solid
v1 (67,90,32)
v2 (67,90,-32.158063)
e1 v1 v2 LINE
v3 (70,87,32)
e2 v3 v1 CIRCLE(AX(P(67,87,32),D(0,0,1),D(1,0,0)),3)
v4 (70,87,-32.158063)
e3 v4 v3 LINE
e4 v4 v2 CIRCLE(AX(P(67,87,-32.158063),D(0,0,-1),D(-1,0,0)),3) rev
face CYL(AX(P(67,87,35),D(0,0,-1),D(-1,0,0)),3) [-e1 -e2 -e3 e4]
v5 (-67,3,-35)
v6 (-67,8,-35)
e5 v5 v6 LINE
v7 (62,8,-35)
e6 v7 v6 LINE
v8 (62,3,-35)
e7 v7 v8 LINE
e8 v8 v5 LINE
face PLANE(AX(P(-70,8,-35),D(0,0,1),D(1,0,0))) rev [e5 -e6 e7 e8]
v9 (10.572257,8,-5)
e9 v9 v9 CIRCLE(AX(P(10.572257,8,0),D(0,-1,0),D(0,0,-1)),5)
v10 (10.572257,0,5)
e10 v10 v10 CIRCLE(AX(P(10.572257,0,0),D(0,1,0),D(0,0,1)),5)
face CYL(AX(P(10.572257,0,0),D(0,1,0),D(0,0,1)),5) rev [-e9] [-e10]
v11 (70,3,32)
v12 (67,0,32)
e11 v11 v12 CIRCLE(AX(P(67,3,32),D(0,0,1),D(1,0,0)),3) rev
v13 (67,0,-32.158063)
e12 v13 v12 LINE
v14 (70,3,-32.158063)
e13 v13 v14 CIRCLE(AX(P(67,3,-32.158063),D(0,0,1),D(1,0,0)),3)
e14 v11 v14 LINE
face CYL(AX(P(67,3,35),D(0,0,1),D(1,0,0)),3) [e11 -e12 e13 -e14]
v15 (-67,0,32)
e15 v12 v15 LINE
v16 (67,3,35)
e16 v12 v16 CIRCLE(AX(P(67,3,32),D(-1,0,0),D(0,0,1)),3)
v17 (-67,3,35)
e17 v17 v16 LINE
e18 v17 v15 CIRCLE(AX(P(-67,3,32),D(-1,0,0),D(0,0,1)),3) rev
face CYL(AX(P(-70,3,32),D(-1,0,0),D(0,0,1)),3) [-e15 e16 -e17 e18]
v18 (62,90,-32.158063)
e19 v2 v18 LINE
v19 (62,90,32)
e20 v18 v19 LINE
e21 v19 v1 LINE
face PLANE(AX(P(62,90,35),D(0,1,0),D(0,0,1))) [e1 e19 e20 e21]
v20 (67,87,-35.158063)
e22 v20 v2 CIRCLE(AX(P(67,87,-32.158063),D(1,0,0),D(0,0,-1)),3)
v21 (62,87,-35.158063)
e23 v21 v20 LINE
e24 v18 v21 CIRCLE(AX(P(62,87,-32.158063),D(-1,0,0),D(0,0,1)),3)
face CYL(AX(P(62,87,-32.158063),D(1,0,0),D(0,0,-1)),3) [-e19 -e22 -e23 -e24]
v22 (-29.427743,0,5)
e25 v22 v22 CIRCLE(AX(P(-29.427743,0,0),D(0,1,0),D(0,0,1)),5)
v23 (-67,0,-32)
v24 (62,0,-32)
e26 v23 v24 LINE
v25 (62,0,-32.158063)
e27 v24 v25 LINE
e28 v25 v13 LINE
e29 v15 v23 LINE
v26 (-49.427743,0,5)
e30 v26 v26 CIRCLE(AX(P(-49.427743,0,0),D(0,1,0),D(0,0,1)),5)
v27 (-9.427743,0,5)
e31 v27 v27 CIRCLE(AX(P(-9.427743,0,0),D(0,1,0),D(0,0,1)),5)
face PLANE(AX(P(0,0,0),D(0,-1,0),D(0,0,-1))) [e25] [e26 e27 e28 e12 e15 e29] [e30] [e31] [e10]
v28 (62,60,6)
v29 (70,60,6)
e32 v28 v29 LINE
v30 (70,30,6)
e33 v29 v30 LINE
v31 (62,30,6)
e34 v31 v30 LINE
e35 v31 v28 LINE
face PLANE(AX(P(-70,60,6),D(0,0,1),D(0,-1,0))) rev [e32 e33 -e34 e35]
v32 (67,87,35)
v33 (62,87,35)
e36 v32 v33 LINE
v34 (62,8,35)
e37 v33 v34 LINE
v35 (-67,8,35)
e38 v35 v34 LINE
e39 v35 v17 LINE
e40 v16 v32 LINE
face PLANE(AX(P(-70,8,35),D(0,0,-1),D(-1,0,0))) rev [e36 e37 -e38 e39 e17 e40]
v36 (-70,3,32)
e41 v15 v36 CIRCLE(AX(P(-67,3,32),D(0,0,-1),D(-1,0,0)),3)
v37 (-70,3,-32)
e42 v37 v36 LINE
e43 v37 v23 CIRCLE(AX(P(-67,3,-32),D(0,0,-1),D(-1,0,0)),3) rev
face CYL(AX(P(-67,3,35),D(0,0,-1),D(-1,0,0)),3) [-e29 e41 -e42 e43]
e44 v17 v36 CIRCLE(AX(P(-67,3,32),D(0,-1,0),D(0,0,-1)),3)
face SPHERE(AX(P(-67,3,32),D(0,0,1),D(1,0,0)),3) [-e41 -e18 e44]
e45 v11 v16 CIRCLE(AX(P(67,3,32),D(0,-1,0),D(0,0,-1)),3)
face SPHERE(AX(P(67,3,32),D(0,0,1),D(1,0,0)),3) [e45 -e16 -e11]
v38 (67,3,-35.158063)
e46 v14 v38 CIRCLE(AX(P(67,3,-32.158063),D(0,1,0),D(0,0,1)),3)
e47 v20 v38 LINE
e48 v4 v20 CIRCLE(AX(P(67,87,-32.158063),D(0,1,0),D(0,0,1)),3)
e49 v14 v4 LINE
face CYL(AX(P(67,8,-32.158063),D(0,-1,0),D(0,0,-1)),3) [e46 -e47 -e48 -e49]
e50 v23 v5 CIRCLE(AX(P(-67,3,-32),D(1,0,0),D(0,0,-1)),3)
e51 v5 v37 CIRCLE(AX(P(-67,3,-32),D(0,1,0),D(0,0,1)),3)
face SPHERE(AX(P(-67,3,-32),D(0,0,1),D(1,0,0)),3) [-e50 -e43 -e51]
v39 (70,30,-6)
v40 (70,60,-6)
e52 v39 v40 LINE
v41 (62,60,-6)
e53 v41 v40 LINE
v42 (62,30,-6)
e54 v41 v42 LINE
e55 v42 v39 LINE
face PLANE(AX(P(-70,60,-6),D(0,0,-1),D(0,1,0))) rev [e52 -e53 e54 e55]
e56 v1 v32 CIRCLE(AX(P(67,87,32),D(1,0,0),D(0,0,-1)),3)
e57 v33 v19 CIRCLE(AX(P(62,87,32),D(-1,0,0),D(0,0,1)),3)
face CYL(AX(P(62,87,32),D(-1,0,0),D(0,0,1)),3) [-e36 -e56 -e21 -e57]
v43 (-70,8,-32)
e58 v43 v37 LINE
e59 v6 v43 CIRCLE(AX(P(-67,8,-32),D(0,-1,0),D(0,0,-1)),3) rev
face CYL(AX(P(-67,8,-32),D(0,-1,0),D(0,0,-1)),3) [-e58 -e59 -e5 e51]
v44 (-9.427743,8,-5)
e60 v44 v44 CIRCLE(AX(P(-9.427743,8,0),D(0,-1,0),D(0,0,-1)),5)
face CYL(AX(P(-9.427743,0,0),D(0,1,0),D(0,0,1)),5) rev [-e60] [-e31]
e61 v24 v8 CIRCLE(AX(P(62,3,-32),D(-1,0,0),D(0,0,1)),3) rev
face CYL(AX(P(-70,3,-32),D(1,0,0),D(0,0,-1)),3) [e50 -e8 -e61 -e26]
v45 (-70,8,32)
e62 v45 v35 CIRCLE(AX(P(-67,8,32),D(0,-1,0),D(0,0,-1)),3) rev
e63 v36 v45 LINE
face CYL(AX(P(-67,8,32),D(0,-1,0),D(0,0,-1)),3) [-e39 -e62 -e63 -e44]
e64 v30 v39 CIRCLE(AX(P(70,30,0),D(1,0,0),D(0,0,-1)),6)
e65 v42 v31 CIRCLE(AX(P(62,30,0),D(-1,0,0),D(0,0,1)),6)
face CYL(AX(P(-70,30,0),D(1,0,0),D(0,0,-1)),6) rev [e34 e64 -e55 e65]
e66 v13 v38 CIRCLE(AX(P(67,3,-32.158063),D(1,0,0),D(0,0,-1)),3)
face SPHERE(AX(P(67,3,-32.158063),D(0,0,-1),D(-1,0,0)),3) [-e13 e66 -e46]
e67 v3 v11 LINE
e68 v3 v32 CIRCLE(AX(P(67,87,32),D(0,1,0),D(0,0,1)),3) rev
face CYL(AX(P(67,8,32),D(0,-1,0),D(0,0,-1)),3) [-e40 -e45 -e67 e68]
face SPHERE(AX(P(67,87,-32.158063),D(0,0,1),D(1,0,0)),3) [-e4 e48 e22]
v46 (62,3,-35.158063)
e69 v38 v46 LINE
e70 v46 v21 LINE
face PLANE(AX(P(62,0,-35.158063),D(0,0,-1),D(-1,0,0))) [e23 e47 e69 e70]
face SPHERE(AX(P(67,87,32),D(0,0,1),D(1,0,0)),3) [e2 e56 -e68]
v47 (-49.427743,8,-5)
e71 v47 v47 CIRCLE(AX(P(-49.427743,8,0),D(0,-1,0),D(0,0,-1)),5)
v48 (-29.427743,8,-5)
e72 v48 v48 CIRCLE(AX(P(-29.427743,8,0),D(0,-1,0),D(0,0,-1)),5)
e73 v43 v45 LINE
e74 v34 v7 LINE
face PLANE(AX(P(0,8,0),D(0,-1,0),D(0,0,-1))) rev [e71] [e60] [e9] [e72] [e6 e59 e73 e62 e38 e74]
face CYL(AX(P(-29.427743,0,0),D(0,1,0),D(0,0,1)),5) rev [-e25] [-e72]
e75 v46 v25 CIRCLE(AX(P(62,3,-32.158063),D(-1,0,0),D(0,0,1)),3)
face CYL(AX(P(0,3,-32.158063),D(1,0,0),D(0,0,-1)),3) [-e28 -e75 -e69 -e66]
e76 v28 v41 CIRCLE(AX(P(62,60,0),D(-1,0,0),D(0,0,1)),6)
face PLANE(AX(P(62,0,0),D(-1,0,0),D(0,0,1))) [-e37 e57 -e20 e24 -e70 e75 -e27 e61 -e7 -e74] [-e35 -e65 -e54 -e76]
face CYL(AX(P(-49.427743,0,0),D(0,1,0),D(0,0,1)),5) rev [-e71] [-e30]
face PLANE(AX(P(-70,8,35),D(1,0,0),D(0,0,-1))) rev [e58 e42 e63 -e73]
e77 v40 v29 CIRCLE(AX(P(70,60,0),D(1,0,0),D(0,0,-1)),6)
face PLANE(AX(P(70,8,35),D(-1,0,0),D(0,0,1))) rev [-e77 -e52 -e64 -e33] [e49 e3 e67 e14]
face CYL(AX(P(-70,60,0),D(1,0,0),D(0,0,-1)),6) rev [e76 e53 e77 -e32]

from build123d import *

# Parameters (mm, degrees)
SKETCH1_W               = 140
SKETCH1_H               = 70
BASE_EXTRUDE_DEPTH      = 8
SKETCH2_W               = 70.158062676
SKETCH2_H               = 90
VERTICAL_FLANGE_DEPTH   = 8
ADUJUSTMENT_SLOT_DEPTH  = 171.106112092
HOLE_PATTERN_DEPTH      = 114.402334064
HOLE_PATTERN_DEPTH_BACK = 114.402334064
SKETCH6_R               = 5
FILLET1_R               = 3
FILLET2_R               = 3
FILLET3_R               = 3


with BuildPart() as part:
    # Sketch1 → Base Extrude (new body)
    with BuildSketch(Plane(origin=(0, 0, 0), x_dir=(1, 0, 0), z_dir=(0, 1, 0))):
        Rectangle(SKETCH1_W, SKETCH1_H)
    extrude(amount=BASE_EXTRUDE_DEPTH)

    # Sketch2 → vertical flange (add)
    with BuildSketch(Plane(origin=(70, 0, 0), x_dir=(0, 0, -1), z_dir=(1, 0, 0))):
        with Locations((0.079031338, 45)):
            Rectangle(SKETCH2_W, SKETCH2_H)
    extrude(amount=-VERTICAL_FLANGE_DEPTH)

    # Sketch3 → adujustment slot (cut, through all)
    with BuildSketch(Plane(origin=(70, 0, 0), x_dir=(0, 0, -1), z_dir=(1, 0, 0))):
        with BuildLine():
            Line((6, 60), (6, 30))
            ThreePointArc((6, 30), (0, 24), (-6, 30))
            Line((-6, 30), (-6, 60))
            ThreePointArc((-6, 60), (0, 66), (6, 60))
        make_face()
    extrude(amount=-ADUJUSTMENT_SLOT_DEPTH, mode=Mode.SUBTRACT)

    # Sketch6 → Hole_Pattern (cut, two sides: drawn at the far end of the back side and taken through both)
    with BuildSketch(Plane(origin=(0, 8, 0), x_dir=(1, 0, 0), z_dir=(0, 1, 0)).offset(-HOLE_PATTERN_DEPTH_BACK)):
        with Locations(Location((-49.427742691, 0, 0), (0, 0, 270))):
            Circle(SKETCH6_R)
        with Locations(Location((-29.427742691, 0, 0), (0, 0, 270))):
            Circle(SKETCH6_R)
        with Locations(Location((-9.427742691, 0, 0), (0, 0, 270))):
            Circle(SKETCH6_R)
        with Locations(Location((10.572257309, 0, 0), (0, 0, 270))):
            Circle(SKETCH6_R)
    extrude(amount=HOLE_PATTERN_DEPTH + HOLE_PATTERN_DEPTH_BACK, mode=Mode.SUBTRACT)

    # Fillet1
    fillet1_edges = [part.edges().sort_by_distance(p)[0] for p in [
        (-4, 0, -35),
        (0, 0, 35),
        (-70, 0, 0),
        (70, 0, -0.079031338),
    ]]
    fillet(fillet1_edges, radius=FILLET1_R)

    # Fillet2
    # the kernel refuses this fillet: 3 mm, written as the material it takes off along each edge
    with BuildSketch(Plane(origin=(-67, 3, 32), x_dir=(-1, 0, 0), z_dir=(0, 0, 1))) as fillet2_piece_1_section:
        Polygon((0, 0), (FILLET2_R, 0), (FILLET2_R, FILLET2_R), (0, FILLET2_R), align=None)
    fillet2_piece_1 = extrude(amount=FILLET2_R, mode=Mode.PRIVATE)
    fillet2_piece_1 = fillet2_piece_1 - Plane(origin=(-67, 3, 32), x_dir=(0.7071067811865475, 0.7071067811865475, 0), z_dir=(0, 0, 1)) * Sphere(FILLET2_R, mode=Mode.PRIVATE)
    add(fillet2_piece_1, mode=Mode.SUBTRACT)
    with BuildSketch(Plane(origin=(67, 3, 32), x_dir=(1, 0, 0), z_dir=(0, 0, 1))) as fillet2_piece_2_section:
        Polygon((0, 0), (FILLET2_R, 0), (FILLET2_R, -FILLET2_R), (0, -FILLET2_R), align=None)
    fillet2_piece_2 = extrude(amount=FILLET2_R, mode=Mode.PRIVATE)
    fillet2_piece_2 = fillet2_piece_2 - Plane(origin=(67, 3, 32), x_dir=(-0.7071067811865475, 0.7071067811865475, 0), z_dir=(0, 0, 1)) * Sphere(FILLET2_R, mode=Mode.PRIVATE)
    add(fillet2_piece_2, mode=Mode.SUBTRACT)
    with BuildSketch(Plane(origin=(67, 87, -32.158062676), x_dir=(0, 0, -1), z_dir=(0, 1, 0))) as fillet2_piece_3_section:
        Polygon((0, 0), (FILLET2_R, 0), (FILLET2_R, -FILLET2_R), (0, -FILLET2_R), align=None)
    fillet2_piece_3 = extrude(amount=FILLET2_R, mode=Mode.PRIVATE)
    fillet2_piece_3 = fillet2_piece_3 - Plane(origin=(67, 87, -32.158062676), x_dir=(-0.7071067811865475, 0, 0.7071067811865475), z_dir=(0, 1, 0)) * Sphere(FILLET2_R, mode=Mode.PRIVATE)
    add(fillet2_piece_3, mode=Mode.SUBTRACT)
    with BuildSketch(Plane(origin=(67, 87, 32), x_dir=(0, 1, 0), z_dir=(0, 0, 1))) as fillet2_piece_4_section:
        Polygon((0, 0), (FILLET2_R, 0), (FILLET2_R, -FILLET2_R), (0, -FILLET2_R), align=None)
    fillet2_piece_4 = extrude(amount=FILLET2_R, mode=Mode.PRIVATE)
    fillet2_piece_4 = fillet2_piece_4 - Plane(origin=(67, 87, 32), x_dir=(-0.7071067811865475, -0.7071067811865475, 0), z_dir=(0, 0, 1)) * Sphere(FILLET2_R, mode=Mode.PRIVATE)
    add(fillet2_piece_4, mode=Mode.SUBTRACT)
    with BuildSketch(Plane(origin=(67, 0, -35.158062676), x_dir=(0, 1, 0), z_dir=(-1, 0, 0)), Plane(origin=(67, 90, 35), x_dir=(0, -1, 0), z_dir=(-1, 0, 0)), Plane(origin=(67, 90, -35.158062676), x_dir=(0, 0, 1), z_dir=(-1, 0, 0))) as fillet2_piece_5:
        with BuildLine():
            CenterArc((FILLET2_R, -FILLET2_R), FILLET2_R, 90, 90)
            Line((0, -FILLET2_R), (0, 0))
            Line((0, 0), (FILLET2_R, 0))
        make_face()
    extrude(amount=12.5, mode=Mode.SUBTRACT)
    with BuildSketch(Plane(origin=(70, 90, -32.158062676), x_dir=(-1, 0, 0), z_dir=(0, 0, 1))) as fillet2_piece_6:
        with BuildLine():
            CenterArc((FILLET2_R, FILLET2_R), FILLET2_R, 180, 90)
            Line((0, FILLET2_R), (0, 0))
            Line((0, 0), (FILLET2_R, 0))
        make_face()
    extrude(amount=64.158062676, mode=Mode.SUBTRACT)
    with BuildSketch(Plane(origin=(70, 3, -35.158062676), x_dir=(-1, 0, 0), z_dir=(0, 1, 0))) as fillet2_piece_7:
        with BuildLine():
            CenterArc((FILLET2_R, FILLET2_R), FILLET2_R, 180, 90)
            Line((0, FILLET2_R), (0, 0))
            Line((0, 0), (FILLET2_R, 0))
        make_face()
    extrude(amount=84, mode=Mode.SUBTRACT)
    with BuildSketch(Plane(origin=(67, 3, -35.158062676), x_dir=(0, -1, 0), z_dir=(-1, 0, 0))) as fillet2_piece_8:
        with BuildLine():
            CenterArc((3 - FILLET2_R, FILLET2_R), FILLET2_R, 270, 90)
            Line((3, FILLET2_R), (3, 0))
            Line((3, 0), (3 - FILLET2_R, 0))
        make_face()
    revolve(axis=Axis((67, 3, -35.158062676), (0, 0, 1)), revolution_arc=90, mode=Mode.SUBTRACT)
    with BuildSketch(Plane(origin=(70, 3, 35), x_dir=(-1, 0, 0), z_dir=(0, 1, 0))) as fillet2_piece_9:
        with BuildLine():
            CenterArc((FILLET2_R, -FILLET2_R), FILLET2_R, 90, 90)
            Line((0, -FILLET2_R), (0, 0))
            Line((0, 0), (FILLET2_R, 0))
        make_face()
    extrude(amount=84, mode=Mode.SUBTRACT)
    with BuildSketch(Plane(origin=(-70, 3, 35), x_dir=(1, 0, 0), z_dir=(0, 1, 0))) as fillet2_piece_10:
        with BuildLine():
            CenterArc((FILLET2_R, FILLET2_R), FILLET2_R, 180, 90)
            Line((0, FILLET2_R), (0, 0))
            Line((0, 0), (FILLET2_R, 0))
        make_face()
    extrude(amount=12.5, mode=Mode.SUBTRACT)

    # Fillet3
    # the kernel refuses this fillet: 3 mm, written as the material it takes off along each edge
    with BuildSketch(Plane(origin=(-67, 3, -32), x_dir=(-1, 0, 0), z_dir=(0, 0, -1))) as fillet3_piece_1_section:
        Polygon((0, 0), (FILLET3_R, 0), (FILLET3_R, -FILLET3_R), (0, -FILLET3_R), align=None)
    fillet3_piece_1 = extrude(amount=FILLET3_R, mode=Mode.PRIVATE)
    fillet3_piece_1 = fillet3_piece_1 - Plane(origin=(-67, 3, -32), x_dir=(0.7071067811865475, 0.7071067811865475, 0), z_dir=(0, 0, -1)) * Sphere(FILLET3_R, mode=Mode.PRIVATE)
    add(fillet3_piece_1, mode=Mode.SUBTRACT)
    with BuildSketch(Plane(origin=(-70, 3, -35), x_dir=(1, 0, 0), z_dir=(0, 1, 0))) as fillet3_piece_2:
        with BuildLine():
            CenterArc((FILLET3_R, -FILLET3_R), FILLET3_R, 90, 90)
            Line((0, -FILLET3_R), (0, 0))
            Line((0, 0), (FILLET3_R, 0))
        make_face()
    extrude(amount=12.5, mode=Mode.SUBTRACT)


solid = part.part
